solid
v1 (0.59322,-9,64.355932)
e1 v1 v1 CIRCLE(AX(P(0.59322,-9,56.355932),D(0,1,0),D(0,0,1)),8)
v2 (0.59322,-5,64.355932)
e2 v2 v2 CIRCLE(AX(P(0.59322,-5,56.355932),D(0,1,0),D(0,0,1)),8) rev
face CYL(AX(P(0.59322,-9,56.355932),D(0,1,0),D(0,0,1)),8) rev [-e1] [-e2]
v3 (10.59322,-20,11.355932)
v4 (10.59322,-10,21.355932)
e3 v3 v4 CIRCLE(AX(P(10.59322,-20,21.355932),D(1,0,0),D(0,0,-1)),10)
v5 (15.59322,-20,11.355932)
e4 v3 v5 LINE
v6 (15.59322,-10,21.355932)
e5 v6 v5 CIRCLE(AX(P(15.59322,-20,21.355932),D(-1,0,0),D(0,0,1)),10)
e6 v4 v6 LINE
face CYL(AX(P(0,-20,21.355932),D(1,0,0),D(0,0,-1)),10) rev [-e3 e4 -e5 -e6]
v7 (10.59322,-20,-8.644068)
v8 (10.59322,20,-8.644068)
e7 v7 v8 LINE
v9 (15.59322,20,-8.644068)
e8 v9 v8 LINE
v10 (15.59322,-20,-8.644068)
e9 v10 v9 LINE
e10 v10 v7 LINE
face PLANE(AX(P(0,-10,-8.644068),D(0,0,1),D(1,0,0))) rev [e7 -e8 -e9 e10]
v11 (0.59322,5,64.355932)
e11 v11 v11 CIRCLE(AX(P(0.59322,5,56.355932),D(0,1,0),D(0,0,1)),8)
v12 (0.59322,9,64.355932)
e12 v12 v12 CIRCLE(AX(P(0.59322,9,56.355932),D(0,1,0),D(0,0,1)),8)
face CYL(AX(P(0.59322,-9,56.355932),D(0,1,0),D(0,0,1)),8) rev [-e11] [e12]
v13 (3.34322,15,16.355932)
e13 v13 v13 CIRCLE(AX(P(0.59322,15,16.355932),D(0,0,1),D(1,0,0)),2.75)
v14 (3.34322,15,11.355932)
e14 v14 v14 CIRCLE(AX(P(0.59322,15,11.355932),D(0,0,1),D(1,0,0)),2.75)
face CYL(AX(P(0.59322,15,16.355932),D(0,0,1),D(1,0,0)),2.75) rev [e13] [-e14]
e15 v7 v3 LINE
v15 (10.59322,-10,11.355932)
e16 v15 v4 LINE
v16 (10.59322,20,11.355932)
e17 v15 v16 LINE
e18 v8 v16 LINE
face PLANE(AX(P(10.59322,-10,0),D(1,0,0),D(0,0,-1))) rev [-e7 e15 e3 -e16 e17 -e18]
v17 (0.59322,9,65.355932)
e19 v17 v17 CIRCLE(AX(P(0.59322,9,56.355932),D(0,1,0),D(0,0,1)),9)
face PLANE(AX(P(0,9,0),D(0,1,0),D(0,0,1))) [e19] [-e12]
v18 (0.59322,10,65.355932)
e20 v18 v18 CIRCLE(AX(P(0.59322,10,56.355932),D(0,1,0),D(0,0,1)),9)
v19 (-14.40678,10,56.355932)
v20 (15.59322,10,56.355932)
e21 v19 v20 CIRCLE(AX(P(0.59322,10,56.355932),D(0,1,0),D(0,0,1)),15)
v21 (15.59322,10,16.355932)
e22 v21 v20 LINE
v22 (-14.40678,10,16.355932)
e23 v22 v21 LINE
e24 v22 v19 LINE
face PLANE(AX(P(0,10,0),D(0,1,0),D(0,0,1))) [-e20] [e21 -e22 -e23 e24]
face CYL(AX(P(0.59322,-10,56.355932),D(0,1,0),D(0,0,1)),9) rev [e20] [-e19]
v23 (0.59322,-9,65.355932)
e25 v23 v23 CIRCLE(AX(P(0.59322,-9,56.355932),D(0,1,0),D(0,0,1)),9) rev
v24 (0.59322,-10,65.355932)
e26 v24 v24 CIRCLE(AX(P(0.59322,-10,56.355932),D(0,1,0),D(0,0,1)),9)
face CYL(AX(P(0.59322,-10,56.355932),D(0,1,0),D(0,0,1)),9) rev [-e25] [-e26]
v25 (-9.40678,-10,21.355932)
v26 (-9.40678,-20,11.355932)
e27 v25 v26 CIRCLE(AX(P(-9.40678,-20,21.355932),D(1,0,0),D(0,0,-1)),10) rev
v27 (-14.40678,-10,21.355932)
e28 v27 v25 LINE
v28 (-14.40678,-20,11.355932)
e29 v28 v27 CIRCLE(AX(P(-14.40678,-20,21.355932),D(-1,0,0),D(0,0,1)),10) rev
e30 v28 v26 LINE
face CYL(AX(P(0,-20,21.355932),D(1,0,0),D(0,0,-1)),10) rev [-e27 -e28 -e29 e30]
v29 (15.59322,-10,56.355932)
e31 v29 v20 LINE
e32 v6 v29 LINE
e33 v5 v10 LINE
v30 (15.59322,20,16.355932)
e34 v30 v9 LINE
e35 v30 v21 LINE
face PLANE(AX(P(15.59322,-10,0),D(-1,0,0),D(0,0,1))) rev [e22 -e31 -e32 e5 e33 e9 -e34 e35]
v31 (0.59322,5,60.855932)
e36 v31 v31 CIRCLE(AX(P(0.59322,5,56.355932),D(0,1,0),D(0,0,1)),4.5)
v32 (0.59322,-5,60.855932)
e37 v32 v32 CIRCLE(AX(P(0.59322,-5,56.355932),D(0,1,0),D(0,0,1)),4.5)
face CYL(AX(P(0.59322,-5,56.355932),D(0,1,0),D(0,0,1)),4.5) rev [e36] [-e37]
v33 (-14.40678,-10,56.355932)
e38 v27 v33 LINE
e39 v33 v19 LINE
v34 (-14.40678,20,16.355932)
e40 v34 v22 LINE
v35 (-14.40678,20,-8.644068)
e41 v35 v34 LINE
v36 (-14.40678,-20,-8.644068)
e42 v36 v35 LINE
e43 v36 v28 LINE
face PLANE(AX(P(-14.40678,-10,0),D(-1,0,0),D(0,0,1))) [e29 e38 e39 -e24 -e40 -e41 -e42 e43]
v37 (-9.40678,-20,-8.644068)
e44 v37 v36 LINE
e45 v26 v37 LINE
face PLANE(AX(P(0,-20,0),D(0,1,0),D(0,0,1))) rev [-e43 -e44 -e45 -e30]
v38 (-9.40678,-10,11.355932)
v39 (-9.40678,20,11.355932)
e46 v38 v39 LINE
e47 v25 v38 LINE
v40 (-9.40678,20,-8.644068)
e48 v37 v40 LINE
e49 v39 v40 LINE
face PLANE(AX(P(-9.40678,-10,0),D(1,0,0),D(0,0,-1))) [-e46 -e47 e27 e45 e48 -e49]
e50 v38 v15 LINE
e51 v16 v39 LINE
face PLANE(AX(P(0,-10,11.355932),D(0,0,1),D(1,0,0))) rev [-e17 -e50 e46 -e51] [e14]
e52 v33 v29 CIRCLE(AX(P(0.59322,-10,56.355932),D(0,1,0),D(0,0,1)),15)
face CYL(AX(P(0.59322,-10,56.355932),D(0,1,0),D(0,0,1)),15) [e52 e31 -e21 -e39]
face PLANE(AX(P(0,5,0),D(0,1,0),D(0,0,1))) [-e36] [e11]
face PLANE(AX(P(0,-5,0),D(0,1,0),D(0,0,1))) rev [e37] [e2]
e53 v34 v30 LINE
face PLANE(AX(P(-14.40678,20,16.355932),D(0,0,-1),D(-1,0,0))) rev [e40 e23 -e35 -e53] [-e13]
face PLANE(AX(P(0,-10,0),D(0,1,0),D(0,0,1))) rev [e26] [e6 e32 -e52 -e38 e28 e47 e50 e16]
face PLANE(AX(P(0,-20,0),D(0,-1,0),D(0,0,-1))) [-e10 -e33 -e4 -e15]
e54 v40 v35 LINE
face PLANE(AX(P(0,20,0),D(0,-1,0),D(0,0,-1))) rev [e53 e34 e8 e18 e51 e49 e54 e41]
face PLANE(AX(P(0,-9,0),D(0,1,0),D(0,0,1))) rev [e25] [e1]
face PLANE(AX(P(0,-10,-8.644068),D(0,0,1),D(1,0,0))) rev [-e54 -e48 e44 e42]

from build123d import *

# Parameters (mm, degrees)
BOSS_EXTRUDE1_DEPTH      = 10
BOSS_EXTRUDE1_DEPTH_BACK = 10
SKETCH1_R                = 9
BOSS_EXTRUDE2_DEPTH      = 9
BOSS_EXTRUDE2_DEPTH_BACK = 9
BOSS_EXTRUDE4_DEPTH      = 5
BOSS_EXTRUDE4_DEPTH_BACK = 5
BOSS_EXTRUDE3_DEPTH      = 10
BOSS_EXTRUDE3_DEPTH_BACK = 30
SKETCH2_W                = 5
SKETCH2_H                = 20
SKETCH6_W                = 30
SKETCH6_H                = 5
BOSS_EXTRUDE6_DEPTH      = 10
FILLET1_R                = 10
M5_CLEARANCE_HOLE1_D     = 5.5


with BuildPart() as part:
    # Sketch1 → Boss-Extrude1 (new, two sides: drawn at the far end of the back side and taken through both)
    with BuildSketch(Plane(origin=(0, 0, 0), x_dir=(1, 0, 0), z_dir=(0, 1, 0)).offset(-BOSS_EXTRUDE1_DEPTH_BACK)):
        with BuildLine():
            Line((-9.406779661, -11.355932203), (-9.406779661, 8.644067797))
            Line((-9.406779661, 8.644067797), (-14.406779661, 8.644067797))
            Line((-14.406779661, 8.644067797), (-14.406779661, -56.355932203))
            ThreePointArc((-14.406779661, -56.355932203), (0.593220339, -71.355932203), (15.593220339, -56.355932203))
            Line((15.593220339, -56.355932203), (15.593220339, 8.644067797))
            Line((15.593220339, 8.644067797), (10.593220339, 8.644067797))
            Line((10.593220339, 8.644067797), (10.593220339, -11.355932203))
            Line((10.593220339, -11.355932203), (-9.406779661, -11.355932203))
        make_face()
        with Locations(Location((0.593220339, -56.355932203, 0), (0, 0, 270))):
            Circle(SKETCH1_R, mode=Mode.SUBTRACT)
    extrude(amount=BOSS_EXTRUDE1_DEPTH + BOSS_EXTRUDE1_DEPTH_BACK)

    # Sketch1<3> → Boss-Extrude2 (add, two sides: drawn at the far end of the back side and taken through both)
    # profile 1 of 2: a face of its own
    with BuildSketch(Plane(origin=(0, 0, 0), x_dir=(1, 0, 0), z_dir=(0, 1, 0)).offset(-BOSS_EXTRUDE2_DEPTH_BACK)):
        with BuildLine():
            ThreePointArc((9.593220339, -56.355932203), (6.95718137, -49.991971173), (0.593220339, -47.355932203))
            ThreePointArc((0.593220339, -47.355932203), (-5.770740692, -62.719893234), (9.593220339, -56.355932203))
        make_face()
        with BuildLine():
            ThreePointArc((8.593220339, -56.355932203), (-5.063633911, -62.012786453), (0.593220339, -48.355932203))
            ThreePointArc((0.593220339, -48.355932203), (6.250074588, -50.699077954), (8.593220339, -56.355932203))
        make_face(mode=Mode.SUBTRACT)
    # profile 2 of 2: a face of its own
    with BuildSketch(Plane(origin=(0, 0, 0), x_dir=(1, 0, 0), z_dir=(0, 1, 0)).offset(-BOSS_EXTRUDE2_DEPTH_BACK)):
        with BuildLine():
            ThreePointArc((9.593220339, -56.355932203), (6.95718137, -49.991971173), (0.593220339, -47.355932203))
            ThreePointArc((0.593220339, -47.355932203), (-5.770740692, -62.719893234), (9.593220339, -56.355932203))
        make_face()
        with BuildLine():
            ThreePointArc((8.593220339, -56.355932203), (-5.063633911, -62.012786453), (0.593220339, -48.355932203))
            ThreePointArc((0.593220339, -48.355932203), (6.250074588, -50.699077954), (8.593220339, -56.355932203))
        make_face(mode=Mode.SUBTRACT)
    extrude(amount=BOSS_EXTRUDE2_DEPTH + BOSS_EXTRUDE2_DEPTH_BACK)

    # Sketch1<4> → Boss-Extrude4 (add, two sides: drawn at the far end of the back side and taken through both)
    # profile 1 of 2: a face of its own
    with BuildSketch(Plane(origin=(0, 0, 0), x_dir=(1, 0, 0), z_dir=(0, 1, 0)).offset(-BOSS_EXTRUDE4_DEPTH_BACK)):
        with BuildLine():
            ThreePointArc((8.593220339, -56.355932203), (6.250074588, -50.699077954), (0.593220339, -48.355932203))
            ThreePointArc((0.593220339, -48.355932203), (-5.063633911, -62.012786453), (8.593220339, -56.355932203))
        make_face()
        with BuildLine():
            ThreePointArc((5.093220339, -56.355932203), (-2.588760176, -59.537912719), (0.593220339, -51.855932203))
            ThreePointArc((0.593220339, -51.855932203), (3.775200854, -53.173951688), (5.093220339, -56.355932203))
        make_face(mode=Mode.SUBTRACT)
    # profile 2 of 2: a face of its own
    with BuildSketch(Plane(origin=(0, 0, 0), x_dir=(1, 0, 0), z_dir=(0, 1, 0)).offset(-BOSS_EXTRUDE4_DEPTH_BACK)):
        with BuildLine():
            ThreePointArc((8.593220339, -56.355932203), (6.250074588, -50.699077954), (0.593220339, -48.355932203))
            ThreePointArc((0.593220339, -48.355932203), (-5.063633911, -62.012786453), (8.593220339, -56.355932203))
        make_face()
        with BuildLine():
            ThreePointArc((5.093220339, -56.355932203), (-2.588760176, -59.537912719), (0.593220339, -51.855932203))
            ThreePointArc((0.593220339, -51.855932203), (3.775200854, -53.173951688), (5.093220339, -56.355932203))
        make_face(mode=Mode.SUBTRACT)
    extrude(amount=BOSS_EXTRUDE4_DEPTH + BOSS_EXTRUDE4_DEPTH_BACK)

    # Sketch2 → Boss-Extrude3 (add, two sides: drawn at the far end of the back side and taken through both)
    with BuildSketch(Plane(origin=(0, 10, 0), x_dir=(1, 0, 0), z_dir=(0, 1, 0)).offset(-BOSS_EXTRUDE3_DEPTH_BACK)):
        with Locations((13.093220339, -1.355932203)):
            Rectangle(SKETCH2_W, SKETCH2_H)
        with Locations((-11.906779661, -1.355932203)):
            Rectangle(SKETCH2_W, SKETCH2_H)
    extrude(amount=BOSS_EXTRUDE3_DEPTH + BOSS_EXTRUDE3_DEPTH_BACK)

    # Sketch6 → Boss-Extrude6 (add)
    with BuildSketch(Plane(origin=(0, 10, 0), x_dir=(1, 0, 0), z_dir=(0, 1, 0))):
        with Locations((0.593220339, -13.855932203)):
            Rectangle(SKETCH6_W, SKETCH6_H)
    extrude(amount=BOSS_EXTRUDE6_DEPTH)

    # Fillet1
    fillet1_edges = [part.edges().sort_by_distance(p)[0] for p in [
        (-11.906779661, -10, 11.355932203),
        (13.093220339, -10, 11.355932203),
    ]]
    fillet(fillet1_edges, radius=FILLET1_R - 0.0001)  # a hair under: the kernel refuses the full size

    # M5 Clearance Hole1 (through all)
    with Locations(Plane.XY.offset(16.355932203)):
        with Locations((0.593220339, 15)):
            Hole(M5_CLEARANCE_HOLE1_D / 2)


solid = part.part
